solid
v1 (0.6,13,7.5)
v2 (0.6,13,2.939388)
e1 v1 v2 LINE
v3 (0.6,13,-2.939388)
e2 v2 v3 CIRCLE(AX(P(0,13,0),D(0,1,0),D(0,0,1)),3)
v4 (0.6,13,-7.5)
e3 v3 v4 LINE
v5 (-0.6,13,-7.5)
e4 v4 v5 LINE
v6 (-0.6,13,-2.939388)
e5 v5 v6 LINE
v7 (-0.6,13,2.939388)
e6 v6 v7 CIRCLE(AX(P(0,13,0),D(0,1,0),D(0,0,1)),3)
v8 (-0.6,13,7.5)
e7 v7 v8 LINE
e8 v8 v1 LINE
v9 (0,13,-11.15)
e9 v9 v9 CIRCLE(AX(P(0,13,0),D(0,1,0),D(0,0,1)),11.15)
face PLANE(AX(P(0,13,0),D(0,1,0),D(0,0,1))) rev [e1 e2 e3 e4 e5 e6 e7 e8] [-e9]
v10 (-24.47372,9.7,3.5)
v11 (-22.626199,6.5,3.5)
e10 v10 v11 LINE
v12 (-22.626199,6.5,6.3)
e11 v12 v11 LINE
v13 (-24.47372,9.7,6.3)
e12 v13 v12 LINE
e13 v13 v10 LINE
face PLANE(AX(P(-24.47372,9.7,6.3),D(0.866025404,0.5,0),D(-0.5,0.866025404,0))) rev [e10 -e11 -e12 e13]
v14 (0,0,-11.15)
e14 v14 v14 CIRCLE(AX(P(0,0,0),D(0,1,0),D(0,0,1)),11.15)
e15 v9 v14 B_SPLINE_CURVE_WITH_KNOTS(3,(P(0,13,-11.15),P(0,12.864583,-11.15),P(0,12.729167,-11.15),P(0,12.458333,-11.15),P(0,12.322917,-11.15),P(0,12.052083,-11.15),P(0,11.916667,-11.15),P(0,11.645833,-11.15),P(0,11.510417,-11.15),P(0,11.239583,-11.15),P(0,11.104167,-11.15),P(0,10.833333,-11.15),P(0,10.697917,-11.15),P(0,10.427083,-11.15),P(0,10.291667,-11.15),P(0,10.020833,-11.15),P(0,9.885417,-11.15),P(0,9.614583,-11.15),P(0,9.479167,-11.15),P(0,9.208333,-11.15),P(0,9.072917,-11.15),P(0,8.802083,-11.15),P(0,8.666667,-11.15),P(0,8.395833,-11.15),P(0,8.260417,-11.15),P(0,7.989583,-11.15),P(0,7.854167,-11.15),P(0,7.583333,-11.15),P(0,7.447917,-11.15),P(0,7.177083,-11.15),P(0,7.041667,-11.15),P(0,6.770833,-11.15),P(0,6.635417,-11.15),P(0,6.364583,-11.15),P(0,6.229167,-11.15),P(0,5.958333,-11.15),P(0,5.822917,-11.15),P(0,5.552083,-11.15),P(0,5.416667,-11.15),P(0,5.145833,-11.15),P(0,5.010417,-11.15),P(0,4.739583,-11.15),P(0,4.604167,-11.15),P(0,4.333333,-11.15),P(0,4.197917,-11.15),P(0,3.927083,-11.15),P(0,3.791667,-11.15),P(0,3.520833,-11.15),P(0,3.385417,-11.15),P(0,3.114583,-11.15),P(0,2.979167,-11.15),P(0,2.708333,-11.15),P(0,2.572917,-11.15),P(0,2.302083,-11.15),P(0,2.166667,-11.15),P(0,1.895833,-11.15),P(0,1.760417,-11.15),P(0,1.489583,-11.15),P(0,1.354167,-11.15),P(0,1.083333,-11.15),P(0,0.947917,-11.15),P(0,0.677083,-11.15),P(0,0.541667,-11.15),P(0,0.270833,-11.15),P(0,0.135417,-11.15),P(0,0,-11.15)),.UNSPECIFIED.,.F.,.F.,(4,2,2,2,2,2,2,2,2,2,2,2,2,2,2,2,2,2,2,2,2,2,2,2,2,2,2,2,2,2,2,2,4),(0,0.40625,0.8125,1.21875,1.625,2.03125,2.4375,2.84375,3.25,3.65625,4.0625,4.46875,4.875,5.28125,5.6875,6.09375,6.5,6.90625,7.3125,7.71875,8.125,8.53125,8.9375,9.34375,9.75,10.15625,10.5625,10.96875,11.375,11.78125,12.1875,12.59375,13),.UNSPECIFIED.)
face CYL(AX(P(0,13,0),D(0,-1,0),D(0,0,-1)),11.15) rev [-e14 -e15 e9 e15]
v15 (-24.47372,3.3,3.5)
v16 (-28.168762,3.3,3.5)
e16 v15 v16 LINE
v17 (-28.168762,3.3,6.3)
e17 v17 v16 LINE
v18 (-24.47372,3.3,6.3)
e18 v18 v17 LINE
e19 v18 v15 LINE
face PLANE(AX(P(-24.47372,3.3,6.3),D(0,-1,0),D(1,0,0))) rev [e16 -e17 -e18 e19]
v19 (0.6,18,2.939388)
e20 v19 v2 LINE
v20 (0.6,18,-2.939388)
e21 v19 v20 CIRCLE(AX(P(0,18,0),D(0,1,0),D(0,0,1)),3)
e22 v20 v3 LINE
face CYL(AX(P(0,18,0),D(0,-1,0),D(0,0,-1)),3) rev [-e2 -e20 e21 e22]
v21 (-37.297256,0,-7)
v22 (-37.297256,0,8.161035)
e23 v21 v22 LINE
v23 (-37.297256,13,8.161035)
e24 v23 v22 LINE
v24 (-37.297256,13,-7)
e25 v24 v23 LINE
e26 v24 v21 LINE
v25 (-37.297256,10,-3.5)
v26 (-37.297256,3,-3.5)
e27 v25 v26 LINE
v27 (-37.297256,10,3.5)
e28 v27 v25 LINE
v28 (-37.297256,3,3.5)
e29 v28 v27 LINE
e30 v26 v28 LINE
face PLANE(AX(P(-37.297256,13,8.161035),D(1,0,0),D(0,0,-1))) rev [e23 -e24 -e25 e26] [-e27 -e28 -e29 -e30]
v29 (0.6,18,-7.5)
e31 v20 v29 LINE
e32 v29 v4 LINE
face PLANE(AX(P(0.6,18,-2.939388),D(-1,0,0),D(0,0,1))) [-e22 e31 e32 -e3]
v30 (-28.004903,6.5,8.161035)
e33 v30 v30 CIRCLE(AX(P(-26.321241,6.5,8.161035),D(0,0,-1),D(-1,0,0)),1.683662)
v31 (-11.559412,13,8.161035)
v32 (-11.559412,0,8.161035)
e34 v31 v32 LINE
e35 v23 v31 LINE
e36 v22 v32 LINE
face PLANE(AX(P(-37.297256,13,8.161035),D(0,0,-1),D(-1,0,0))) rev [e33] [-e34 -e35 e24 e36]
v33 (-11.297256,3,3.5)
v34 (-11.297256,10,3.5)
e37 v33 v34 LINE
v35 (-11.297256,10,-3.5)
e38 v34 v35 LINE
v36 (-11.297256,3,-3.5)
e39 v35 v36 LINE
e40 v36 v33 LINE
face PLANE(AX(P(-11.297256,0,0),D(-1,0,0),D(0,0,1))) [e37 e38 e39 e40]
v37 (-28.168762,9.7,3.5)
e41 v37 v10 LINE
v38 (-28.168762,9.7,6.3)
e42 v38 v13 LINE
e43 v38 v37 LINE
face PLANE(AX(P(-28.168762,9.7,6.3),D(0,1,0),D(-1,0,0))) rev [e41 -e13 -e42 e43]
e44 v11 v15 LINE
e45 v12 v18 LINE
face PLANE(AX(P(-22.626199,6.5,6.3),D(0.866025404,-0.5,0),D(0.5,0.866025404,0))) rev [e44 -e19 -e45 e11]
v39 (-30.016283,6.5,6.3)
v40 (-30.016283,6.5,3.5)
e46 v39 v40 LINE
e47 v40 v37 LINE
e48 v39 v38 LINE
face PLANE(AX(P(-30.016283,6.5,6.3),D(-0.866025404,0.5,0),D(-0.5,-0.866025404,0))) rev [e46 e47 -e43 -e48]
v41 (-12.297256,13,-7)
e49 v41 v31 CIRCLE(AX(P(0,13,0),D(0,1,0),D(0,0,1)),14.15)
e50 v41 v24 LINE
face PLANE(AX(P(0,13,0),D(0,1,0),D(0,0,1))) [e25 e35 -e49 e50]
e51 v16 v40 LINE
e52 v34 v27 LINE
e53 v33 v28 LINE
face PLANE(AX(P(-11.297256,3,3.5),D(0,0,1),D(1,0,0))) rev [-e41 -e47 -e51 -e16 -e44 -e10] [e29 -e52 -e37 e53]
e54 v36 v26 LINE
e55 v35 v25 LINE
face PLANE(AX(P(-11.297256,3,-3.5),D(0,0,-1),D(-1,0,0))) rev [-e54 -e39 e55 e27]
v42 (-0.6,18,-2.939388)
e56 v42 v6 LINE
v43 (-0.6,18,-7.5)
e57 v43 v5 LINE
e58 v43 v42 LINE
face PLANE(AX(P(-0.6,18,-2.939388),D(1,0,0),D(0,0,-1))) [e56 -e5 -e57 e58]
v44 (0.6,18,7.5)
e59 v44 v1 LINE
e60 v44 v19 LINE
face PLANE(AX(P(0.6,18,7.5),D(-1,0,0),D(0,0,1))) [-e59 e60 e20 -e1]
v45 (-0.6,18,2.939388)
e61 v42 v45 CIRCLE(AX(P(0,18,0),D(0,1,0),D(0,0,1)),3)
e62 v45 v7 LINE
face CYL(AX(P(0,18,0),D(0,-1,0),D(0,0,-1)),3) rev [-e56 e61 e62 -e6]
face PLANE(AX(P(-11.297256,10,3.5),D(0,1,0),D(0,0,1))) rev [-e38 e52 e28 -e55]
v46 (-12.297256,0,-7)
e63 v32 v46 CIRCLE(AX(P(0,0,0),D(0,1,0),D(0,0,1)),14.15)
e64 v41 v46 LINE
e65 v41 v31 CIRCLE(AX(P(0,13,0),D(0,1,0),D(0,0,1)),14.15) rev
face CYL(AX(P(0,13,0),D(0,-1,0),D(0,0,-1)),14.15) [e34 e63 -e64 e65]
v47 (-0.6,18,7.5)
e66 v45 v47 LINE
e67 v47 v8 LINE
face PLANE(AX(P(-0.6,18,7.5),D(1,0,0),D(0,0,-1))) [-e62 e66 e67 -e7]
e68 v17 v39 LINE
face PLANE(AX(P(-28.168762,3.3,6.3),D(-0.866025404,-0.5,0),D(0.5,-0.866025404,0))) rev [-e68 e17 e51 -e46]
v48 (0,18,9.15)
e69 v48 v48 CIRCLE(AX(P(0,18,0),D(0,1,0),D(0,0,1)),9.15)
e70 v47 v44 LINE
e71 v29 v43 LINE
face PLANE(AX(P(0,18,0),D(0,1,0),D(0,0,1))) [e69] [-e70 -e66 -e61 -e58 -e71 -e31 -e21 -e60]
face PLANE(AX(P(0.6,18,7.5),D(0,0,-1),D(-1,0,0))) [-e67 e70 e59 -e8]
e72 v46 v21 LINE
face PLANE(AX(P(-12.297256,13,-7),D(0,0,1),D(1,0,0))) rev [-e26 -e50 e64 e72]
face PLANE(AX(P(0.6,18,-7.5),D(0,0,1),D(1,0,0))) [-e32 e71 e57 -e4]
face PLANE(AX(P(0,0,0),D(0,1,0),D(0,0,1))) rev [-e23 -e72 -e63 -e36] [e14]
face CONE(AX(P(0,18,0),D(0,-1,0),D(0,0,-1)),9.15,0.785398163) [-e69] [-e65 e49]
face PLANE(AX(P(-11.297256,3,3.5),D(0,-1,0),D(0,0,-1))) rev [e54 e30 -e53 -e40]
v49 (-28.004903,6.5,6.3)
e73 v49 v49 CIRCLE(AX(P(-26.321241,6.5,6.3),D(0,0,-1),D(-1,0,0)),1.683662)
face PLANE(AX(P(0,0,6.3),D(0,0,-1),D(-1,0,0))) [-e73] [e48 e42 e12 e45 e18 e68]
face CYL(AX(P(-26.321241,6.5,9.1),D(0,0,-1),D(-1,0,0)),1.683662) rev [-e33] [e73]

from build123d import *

# Parameters (mm, degrees)
ESBO_O2_R                = 11.15
RESSALTO_EXTRUS_O1_DEPTH = 13
ESBO_O3_W                = 7
ESBO_O3_H                = 7
CORTE_EXTRUS_O1_DEPTH    = 26
CORTE_EXTRUS_O2_DEPTH    = 2.8
ESBO_O10_R               = 1.683661958
CORTE_EXTRUS_O3_DEPTH    = 2.8
ESBO_O11_R               = 14.15
RESSALTO_EXTRUS_O2_DEPTH = 5
CHANFRO1_SIZE            = 5


with BuildPart() as part:
    # Esboço2 → Ressalto-extrusão1 (new body)
    with BuildSketch(Plane(origin=(0, 0, 0), x_dir=(1, 0, 0), z_dir=(0, 1, 0))):
        with BuildLine():
            Line((-12.297255791, 7), (-37.297255791, 7))
            Line((-37.297255791, 7), (-37.297255791, -8.161034979))
            Line((-37.297255791, -8.161034979), (-11.559412099, -8.161034979))
            ThreePointArc((-11.559412099, -8.161034979), (14.133272661, 0.687825475), (-12.297255791, 7))
        make_face()
        with Locations(Location((0, 0, 0), (0, 0, 90))):
            Circle(ESBO_O2_R, mode=Mode.SUBTRACT)
    extrude(amount=RESSALTO_EXTRUS_O1_DEPTH)

    # Esboço3 → Corte-extrusão1 (cut)
    with BuildSketch(Plane.ZY.offset(37.297255791)):
        with Locations((0, 6.5)):
            Rectangle(ESBO_O3_W, ESBO_O3_H)
    extrude(amount=-CORTE_EXTRUS_O1_DEPTH, mode=Mode.SUBTRACT)

    # Esboço7 → Corte-extrusão2 (cut)
    with BuildSketch(Plane(origin=(0, 0, 3.5), x_dir=(-1, 0, 0), z_dir=(0, 0, -1))):
        Polygon((22.62619922, 6.5), (24.473720081, 3.3), (28.168761804, 3.3), (30.016282665, 6.5), (28.168761804, 9.7), (24.473720081, 9.7), align=None)
    extrude(amount=-CORTE_EXTRUS_O2_DEPTH, mode=Mode.SUBTRACT)

    # Esboço10 → Corte-extrusão3 (cut)
    with BuildSketch(Plane(origin=(0, 0, 6.3), x_dir=(-1, 0, 0), z_dir=(0, 0, -1))):
        with Locations((26.321240942, 6.5)):
            Circle(ESBO_O10_R)
    extrude(amount=-CORTE_EXTRUS_O3_DEPTH, mode=Mode.SUBTRACT)

    # Esboço11 → Ressalto-extrusão2 (add)
    with BuildSketch(Plane(origin=(0, 13, 0), x_dir=(1, 0, 0), z_dir=(0, 1, 0))):
        with Locations(Location((0, 0, 0), (0, 0, 150.350053351))):
            Circle(ESBO_O11_R)
        with BuildLine():
            Line((0.6, -7.5), (0.6, -2.939387691))
            ThreePointArc((0.6, -2.939387691), (3, 0), (0.6, 2.939387691))
            Line((0.6, 2.939387691), (0.6, 7.5))
            Line((0.6, 7.5), (-0.6, 7.5))
            Line((-0.6, 7.5), (-0.6, 2.939387691))
            ThreePointArc((-0.6, 2.939387691), (-3, 0), (-0.6, -2.939387691))
            Line((-0.6, -2.939387691), (-0.6, -7.5))
            Line((-0.6, -7.5), (0.6, -7.5))
        make_face(mode=Mode.SUBTRACT)
    extrude(amount=RESSALTO_EXTRUS_O2_DEPTH)

    # Chanfro1
    chanfro1_edges = [part.edges().sort_by_distance(p)[0] for p in [
        (12.297255791, 18, 7),
    ]]
    chamfer(chanfro1_edges, length=CHANFRO1_SIZE - 0.0001)  # a hair under: the kernel refuses the full size


solid = part.part
